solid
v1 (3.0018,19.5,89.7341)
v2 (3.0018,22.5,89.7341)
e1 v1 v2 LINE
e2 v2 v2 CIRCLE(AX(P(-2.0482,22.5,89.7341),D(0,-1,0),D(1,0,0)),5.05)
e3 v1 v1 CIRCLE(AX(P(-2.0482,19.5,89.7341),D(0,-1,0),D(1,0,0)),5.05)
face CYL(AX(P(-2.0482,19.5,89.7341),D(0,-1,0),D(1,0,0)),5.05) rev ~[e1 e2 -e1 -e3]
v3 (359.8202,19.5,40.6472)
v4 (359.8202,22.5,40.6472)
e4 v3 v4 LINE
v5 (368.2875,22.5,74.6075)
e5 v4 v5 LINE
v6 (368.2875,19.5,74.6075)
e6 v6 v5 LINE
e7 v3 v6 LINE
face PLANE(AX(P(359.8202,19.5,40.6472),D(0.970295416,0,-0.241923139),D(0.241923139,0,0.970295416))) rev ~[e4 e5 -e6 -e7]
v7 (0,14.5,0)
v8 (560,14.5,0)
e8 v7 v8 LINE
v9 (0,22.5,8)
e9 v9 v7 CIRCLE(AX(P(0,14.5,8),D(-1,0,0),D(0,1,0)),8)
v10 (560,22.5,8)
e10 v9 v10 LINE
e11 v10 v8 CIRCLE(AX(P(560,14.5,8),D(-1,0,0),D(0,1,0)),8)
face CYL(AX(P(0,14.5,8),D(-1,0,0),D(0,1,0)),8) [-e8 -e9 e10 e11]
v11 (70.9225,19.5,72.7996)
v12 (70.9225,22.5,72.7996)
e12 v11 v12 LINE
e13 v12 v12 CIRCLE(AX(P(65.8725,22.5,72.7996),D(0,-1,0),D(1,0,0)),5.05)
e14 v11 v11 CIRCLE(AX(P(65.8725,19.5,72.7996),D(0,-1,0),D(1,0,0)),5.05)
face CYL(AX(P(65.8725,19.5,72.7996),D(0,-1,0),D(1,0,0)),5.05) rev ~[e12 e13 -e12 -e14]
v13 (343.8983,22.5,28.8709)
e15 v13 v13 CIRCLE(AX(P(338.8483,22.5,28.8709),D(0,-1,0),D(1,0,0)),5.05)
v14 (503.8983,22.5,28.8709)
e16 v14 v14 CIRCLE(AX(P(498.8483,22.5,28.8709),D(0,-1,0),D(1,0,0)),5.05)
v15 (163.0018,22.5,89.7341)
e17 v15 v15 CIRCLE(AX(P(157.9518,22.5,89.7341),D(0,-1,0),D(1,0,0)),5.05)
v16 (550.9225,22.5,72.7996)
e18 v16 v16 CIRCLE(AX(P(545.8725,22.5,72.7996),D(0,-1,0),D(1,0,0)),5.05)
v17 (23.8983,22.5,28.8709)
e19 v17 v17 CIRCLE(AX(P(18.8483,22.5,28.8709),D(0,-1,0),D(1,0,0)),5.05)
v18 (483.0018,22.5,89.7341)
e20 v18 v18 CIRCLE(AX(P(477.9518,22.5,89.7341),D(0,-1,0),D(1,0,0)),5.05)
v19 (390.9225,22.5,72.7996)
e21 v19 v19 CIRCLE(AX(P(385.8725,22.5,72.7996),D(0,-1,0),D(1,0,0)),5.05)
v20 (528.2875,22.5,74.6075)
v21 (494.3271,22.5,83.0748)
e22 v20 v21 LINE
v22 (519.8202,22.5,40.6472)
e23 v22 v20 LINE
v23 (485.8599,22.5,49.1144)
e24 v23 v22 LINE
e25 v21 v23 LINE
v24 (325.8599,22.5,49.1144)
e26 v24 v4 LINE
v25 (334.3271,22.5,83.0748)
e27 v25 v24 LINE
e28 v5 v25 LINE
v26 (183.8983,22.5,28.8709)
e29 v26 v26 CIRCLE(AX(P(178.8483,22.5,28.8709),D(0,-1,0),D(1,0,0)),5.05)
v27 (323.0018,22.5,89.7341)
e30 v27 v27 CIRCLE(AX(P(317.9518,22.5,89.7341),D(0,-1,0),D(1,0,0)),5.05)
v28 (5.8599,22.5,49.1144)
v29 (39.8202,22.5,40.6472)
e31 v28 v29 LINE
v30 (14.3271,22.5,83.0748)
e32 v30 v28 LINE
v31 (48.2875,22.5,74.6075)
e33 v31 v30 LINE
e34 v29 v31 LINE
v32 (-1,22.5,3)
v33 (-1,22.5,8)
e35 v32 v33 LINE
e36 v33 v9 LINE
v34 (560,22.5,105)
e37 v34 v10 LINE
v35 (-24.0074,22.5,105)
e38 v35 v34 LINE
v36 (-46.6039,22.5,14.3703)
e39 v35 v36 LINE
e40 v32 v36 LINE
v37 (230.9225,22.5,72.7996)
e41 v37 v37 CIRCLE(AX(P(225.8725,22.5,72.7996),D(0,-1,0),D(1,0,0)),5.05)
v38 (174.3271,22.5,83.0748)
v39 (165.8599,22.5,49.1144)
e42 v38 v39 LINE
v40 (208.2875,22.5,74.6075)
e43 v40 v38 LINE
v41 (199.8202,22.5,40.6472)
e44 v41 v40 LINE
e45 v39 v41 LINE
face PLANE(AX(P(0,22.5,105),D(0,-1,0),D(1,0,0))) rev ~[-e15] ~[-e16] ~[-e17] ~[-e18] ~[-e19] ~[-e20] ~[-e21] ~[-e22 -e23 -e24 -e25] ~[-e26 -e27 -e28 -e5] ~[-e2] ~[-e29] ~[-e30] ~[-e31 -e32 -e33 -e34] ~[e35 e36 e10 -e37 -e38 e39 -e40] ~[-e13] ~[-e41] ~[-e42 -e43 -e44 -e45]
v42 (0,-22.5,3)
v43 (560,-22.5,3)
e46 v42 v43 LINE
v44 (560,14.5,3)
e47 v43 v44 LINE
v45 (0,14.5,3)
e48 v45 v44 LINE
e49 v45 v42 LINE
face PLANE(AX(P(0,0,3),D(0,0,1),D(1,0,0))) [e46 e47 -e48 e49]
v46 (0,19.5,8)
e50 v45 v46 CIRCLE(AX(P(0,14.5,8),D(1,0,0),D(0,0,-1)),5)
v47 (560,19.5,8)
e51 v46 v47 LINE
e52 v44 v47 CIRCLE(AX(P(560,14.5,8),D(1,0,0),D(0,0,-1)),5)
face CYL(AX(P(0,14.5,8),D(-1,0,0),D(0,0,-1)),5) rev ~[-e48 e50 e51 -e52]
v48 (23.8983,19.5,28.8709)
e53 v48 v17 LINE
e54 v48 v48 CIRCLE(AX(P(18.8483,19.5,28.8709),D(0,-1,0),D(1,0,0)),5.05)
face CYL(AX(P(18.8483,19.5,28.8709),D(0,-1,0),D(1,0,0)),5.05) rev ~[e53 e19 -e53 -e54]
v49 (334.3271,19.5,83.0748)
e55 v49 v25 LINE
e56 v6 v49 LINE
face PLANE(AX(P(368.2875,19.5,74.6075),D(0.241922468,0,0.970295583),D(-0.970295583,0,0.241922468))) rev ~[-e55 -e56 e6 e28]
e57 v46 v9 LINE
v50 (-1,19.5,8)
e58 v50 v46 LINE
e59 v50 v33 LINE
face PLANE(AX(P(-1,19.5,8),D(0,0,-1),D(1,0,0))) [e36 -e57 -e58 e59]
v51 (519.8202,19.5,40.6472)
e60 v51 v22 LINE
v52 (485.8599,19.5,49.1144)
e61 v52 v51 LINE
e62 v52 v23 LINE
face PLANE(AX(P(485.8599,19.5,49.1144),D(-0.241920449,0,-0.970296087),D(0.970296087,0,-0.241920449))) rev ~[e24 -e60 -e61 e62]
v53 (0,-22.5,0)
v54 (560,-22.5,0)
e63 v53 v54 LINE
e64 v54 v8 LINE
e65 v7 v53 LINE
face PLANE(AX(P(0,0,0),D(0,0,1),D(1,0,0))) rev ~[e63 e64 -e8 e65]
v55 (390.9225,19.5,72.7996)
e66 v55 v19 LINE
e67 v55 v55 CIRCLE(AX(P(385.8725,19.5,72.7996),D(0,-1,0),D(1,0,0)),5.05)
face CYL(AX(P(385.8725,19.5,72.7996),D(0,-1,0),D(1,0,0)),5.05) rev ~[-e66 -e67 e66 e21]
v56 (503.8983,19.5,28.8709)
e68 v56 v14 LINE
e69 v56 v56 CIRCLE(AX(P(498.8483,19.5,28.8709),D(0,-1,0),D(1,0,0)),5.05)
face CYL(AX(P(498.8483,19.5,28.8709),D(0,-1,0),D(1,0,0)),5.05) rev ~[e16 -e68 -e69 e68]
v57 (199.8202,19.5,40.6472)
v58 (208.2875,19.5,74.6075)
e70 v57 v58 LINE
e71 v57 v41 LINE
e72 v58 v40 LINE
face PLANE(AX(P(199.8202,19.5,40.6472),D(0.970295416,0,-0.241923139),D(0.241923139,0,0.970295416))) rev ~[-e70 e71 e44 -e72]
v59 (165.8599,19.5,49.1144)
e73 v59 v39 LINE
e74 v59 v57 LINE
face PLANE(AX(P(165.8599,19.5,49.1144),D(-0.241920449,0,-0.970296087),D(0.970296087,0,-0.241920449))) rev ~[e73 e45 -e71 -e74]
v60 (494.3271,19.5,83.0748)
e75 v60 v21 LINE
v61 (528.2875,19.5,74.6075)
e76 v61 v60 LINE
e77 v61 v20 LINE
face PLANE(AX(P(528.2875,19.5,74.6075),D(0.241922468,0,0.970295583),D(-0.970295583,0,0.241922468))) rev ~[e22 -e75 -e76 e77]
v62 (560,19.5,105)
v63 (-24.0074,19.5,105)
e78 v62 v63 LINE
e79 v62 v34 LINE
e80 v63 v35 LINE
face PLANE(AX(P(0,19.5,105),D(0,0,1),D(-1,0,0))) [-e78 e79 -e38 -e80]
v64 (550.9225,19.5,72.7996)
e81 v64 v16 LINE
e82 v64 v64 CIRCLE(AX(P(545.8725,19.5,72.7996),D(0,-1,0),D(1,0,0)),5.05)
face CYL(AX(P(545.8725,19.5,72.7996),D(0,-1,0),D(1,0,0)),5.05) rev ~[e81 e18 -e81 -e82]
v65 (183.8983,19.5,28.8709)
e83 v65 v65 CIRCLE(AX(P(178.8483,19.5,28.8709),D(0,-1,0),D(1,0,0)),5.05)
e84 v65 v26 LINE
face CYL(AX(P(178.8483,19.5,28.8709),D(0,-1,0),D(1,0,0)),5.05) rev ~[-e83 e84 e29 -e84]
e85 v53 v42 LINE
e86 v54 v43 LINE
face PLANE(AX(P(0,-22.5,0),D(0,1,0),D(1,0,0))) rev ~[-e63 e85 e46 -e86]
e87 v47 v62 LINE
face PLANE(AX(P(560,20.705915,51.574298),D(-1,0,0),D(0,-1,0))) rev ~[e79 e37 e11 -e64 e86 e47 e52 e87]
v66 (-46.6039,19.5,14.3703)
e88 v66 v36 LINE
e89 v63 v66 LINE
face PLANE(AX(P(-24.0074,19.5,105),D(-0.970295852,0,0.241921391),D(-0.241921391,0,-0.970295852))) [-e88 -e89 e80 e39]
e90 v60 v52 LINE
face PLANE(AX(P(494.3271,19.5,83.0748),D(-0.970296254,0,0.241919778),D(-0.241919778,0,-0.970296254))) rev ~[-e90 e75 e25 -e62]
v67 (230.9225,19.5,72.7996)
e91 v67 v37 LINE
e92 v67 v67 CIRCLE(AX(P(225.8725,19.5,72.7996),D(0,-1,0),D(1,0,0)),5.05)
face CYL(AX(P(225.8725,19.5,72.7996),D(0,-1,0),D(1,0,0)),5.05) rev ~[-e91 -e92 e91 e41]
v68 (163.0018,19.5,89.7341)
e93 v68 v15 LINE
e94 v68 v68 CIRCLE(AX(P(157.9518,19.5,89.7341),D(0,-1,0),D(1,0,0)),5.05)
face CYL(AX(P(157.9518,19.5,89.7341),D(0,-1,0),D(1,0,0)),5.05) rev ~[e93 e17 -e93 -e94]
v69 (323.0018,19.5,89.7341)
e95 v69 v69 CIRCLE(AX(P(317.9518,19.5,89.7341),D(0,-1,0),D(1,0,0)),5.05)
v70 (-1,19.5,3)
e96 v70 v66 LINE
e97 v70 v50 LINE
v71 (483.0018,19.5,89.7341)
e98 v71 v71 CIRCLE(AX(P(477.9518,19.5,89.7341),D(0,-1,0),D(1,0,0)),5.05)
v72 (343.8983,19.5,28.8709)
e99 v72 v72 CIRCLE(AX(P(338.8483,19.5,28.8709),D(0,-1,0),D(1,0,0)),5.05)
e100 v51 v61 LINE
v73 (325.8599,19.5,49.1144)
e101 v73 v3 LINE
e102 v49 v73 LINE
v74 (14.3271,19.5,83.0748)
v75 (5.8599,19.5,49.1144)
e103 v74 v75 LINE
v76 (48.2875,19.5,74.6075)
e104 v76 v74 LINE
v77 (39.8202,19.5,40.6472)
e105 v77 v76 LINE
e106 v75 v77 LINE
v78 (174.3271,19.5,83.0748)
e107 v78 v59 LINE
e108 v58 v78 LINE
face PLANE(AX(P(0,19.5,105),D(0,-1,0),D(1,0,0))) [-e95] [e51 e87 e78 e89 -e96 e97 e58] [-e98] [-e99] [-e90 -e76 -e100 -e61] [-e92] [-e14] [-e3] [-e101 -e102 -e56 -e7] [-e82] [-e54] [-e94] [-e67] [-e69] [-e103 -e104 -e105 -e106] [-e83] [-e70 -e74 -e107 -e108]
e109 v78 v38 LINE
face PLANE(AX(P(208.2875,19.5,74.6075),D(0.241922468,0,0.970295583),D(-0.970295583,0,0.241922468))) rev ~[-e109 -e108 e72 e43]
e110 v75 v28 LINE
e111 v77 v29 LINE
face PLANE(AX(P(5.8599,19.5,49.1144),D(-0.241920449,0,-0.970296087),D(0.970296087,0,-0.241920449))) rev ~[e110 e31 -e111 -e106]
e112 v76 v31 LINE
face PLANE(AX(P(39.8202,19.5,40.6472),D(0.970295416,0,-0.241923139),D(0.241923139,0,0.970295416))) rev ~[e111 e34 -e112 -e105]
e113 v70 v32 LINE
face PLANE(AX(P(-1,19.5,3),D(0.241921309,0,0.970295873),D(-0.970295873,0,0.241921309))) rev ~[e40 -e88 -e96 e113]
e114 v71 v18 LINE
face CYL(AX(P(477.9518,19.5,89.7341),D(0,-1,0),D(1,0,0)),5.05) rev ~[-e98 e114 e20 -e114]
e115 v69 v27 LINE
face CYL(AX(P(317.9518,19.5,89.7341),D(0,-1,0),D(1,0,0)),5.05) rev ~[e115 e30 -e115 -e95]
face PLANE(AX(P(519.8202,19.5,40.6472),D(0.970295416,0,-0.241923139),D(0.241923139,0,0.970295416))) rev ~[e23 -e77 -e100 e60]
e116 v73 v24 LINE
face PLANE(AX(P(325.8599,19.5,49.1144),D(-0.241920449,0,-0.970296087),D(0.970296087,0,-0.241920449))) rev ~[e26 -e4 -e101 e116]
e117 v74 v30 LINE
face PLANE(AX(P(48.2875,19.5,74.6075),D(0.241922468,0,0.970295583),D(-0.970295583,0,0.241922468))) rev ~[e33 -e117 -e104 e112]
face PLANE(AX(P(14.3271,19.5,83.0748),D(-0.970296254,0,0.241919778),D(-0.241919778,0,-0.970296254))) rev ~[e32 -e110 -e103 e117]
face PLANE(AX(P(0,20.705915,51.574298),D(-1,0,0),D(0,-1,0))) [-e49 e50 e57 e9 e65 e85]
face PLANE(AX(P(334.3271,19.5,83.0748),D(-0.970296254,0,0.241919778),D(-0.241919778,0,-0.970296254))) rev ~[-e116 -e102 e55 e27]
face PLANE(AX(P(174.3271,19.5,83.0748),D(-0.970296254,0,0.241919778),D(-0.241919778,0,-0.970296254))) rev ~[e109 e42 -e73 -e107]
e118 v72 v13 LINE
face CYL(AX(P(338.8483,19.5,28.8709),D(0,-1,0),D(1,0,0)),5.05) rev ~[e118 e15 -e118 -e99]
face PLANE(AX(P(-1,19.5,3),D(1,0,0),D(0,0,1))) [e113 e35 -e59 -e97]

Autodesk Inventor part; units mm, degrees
ref_plane "YZ Plane" through (0, 0, 0) normal (1, 0, 0) x (0, 1, 0)
ref_plane "XZ Plane" through (0, 0, 0) normal (0, 1, 0) x (-1, 0, 0)
ref_plane "XY Plane" through (0, 0, 0) normal (0, 0, 1) x (1, 0, 0)
sketch "Sketch1" plane through (0, 0, 0) normal (0, 0, 1) x (1, 0, 0)
  line L0 (0, -22.5) -> (560, -22.5)
  line L1 (560, -22.5) -> (560, 22.5)
  line L2 (560, 22.5) -> (0, 22.5)
  line L3 (0, 22.5) -> (0, -22.5)
  line L4 (0, -22.5) -> (560, 22.5) construction
  line L5 (560, -22.5) -> (0, 22.5) construction
  point P0 (0, 0)
  point P1 (0, 0)
  dimension "d154" = 560
  dimension "d155" = 45
extrude "Plate3" add sketch "Sketch1" along normal blind 3
sketch "Sketch7" plane through (0, 19.5, 0) normal (0, 1, 0) x (-1, 0, 0)
  line L0 (-560, 0) -> (0, 0)
  line L1 (0, 0) -> (0, 105)
  line L2 (0, 105) -> (-560, 105)
  line L3 (-560, 105) -> (-560, 0)
edge flange "Flange3" height 105 angle 90 thickness 3 bend radius 5 thickness toward (0, 1, 0) relief round relief width 3 relief depth 1.5 edges at (280, 22.5, 3) wall of the first edge with corners at (560, 19.5, 0) (0, 19.5, 0) (0, 19.5, 105) (560, 19.5, 105)
bend "Bend3"
corner "Corner3"
sketch "Sketch11" plane through (0, 19.5, 105) normal (0, -1, 0) x (1, 0, 0)
  line L0 (0, -97) -> (560, -97) projected
  line L1 (560, -97) -> (560, 0) projected
  line L2 (560, 0) -> (0, 0) projected
  line L3 (0, -97) -> (0, 0) projected
  line L4 (0, 0) -> (-24.0074, 0)
  line L5 (-24.0074, 0) -> (-49.4388, -102)
  line L6 (-49.4388, -102) -> (-1, -102)
  line L7 (-1, -102) -> (-1, -97)
  line L8 (-1, -97) -> (0, -97)
  line L9 (560, -102) -> (0, -102) projected
  line L10 (-1, -102) -> (-46.6039, -90.6297)
  point P0 (0, -105)
  dimension "d193" = 1
  dimension "d194" = 24.0074
  dimension "d195" = 14
  dimension "d203" = 47
extrude "Extrusion6" add sketch "Sketch11" against normal up to surface (3 mm away) contours L8 L7 L10 L5 L4 L3
sketch "Sketch12" plane through (560, 19.5, 8) normal (0, -1, 0) x (1, 0, 0)
  line L0 (-511.7125, 66.6075) -> (-545.6729, 75.0748)
  line L1 (-545.6729, 75.0748) -> (-554.1401, 41.1144)
  line L2 (-554.1401, 41.1144) -> (-520.1798, 32.6472)
  line L3 (-520.1798, 32.6472) -> (-511.7125, 66.6075)
  line L4 (-511.7125, 66.6075) -> (-554.1401, 41.1144) construction
  line L5 (-545.6729, 75.0748) -> (-520.1798, 32.6472) construction
  circle A0 centre (-541.1517, 20.8709) radius 5.05
  circle A1 centre (-494.1275, 64.7996) radius 5.05
  circle A2 centre (-562.0482, 81.7341) radius 5.05
  line L6 (-494.1275, 64.7996) -> (-562.0482, 81.7341) construction
  line L7 (-562.0482, 81.7341) -> (-541.1517, 20.8709) construction
  line L8 (-541.1517, 20.8709) -> (-494.1275, 64.7996) construction
  line L9 (-528.6927, 70.8411) -> (-541.1517, 20.8709) construction
  line L10 (-584.0074, 97) -> (-606.6039, 6.3703) projected
  point P0 (-560, -8)
  point P1 (-532.9263, 53.861)
  point P2 (-544.0023, 9.4376)
  dimension "d206" = 35
  dimension "d207" = 35
  dimension "d208" = 10.1
  dimension "d209" = 70
  dimension "d210" = 54
  dimension "d211" = 20
  dimension "d213" = 12
  dimension "d214" = 60
extrude "Cut1" cut sketch "Sketch12" against normal blind 3
pattern_linear "Rectangular Pattern5" count 4 spacing 160 along (1, 0, 0) of "Cut1"
properties part number "DSB-102 ridge bottom" material "Stainless Steel"
